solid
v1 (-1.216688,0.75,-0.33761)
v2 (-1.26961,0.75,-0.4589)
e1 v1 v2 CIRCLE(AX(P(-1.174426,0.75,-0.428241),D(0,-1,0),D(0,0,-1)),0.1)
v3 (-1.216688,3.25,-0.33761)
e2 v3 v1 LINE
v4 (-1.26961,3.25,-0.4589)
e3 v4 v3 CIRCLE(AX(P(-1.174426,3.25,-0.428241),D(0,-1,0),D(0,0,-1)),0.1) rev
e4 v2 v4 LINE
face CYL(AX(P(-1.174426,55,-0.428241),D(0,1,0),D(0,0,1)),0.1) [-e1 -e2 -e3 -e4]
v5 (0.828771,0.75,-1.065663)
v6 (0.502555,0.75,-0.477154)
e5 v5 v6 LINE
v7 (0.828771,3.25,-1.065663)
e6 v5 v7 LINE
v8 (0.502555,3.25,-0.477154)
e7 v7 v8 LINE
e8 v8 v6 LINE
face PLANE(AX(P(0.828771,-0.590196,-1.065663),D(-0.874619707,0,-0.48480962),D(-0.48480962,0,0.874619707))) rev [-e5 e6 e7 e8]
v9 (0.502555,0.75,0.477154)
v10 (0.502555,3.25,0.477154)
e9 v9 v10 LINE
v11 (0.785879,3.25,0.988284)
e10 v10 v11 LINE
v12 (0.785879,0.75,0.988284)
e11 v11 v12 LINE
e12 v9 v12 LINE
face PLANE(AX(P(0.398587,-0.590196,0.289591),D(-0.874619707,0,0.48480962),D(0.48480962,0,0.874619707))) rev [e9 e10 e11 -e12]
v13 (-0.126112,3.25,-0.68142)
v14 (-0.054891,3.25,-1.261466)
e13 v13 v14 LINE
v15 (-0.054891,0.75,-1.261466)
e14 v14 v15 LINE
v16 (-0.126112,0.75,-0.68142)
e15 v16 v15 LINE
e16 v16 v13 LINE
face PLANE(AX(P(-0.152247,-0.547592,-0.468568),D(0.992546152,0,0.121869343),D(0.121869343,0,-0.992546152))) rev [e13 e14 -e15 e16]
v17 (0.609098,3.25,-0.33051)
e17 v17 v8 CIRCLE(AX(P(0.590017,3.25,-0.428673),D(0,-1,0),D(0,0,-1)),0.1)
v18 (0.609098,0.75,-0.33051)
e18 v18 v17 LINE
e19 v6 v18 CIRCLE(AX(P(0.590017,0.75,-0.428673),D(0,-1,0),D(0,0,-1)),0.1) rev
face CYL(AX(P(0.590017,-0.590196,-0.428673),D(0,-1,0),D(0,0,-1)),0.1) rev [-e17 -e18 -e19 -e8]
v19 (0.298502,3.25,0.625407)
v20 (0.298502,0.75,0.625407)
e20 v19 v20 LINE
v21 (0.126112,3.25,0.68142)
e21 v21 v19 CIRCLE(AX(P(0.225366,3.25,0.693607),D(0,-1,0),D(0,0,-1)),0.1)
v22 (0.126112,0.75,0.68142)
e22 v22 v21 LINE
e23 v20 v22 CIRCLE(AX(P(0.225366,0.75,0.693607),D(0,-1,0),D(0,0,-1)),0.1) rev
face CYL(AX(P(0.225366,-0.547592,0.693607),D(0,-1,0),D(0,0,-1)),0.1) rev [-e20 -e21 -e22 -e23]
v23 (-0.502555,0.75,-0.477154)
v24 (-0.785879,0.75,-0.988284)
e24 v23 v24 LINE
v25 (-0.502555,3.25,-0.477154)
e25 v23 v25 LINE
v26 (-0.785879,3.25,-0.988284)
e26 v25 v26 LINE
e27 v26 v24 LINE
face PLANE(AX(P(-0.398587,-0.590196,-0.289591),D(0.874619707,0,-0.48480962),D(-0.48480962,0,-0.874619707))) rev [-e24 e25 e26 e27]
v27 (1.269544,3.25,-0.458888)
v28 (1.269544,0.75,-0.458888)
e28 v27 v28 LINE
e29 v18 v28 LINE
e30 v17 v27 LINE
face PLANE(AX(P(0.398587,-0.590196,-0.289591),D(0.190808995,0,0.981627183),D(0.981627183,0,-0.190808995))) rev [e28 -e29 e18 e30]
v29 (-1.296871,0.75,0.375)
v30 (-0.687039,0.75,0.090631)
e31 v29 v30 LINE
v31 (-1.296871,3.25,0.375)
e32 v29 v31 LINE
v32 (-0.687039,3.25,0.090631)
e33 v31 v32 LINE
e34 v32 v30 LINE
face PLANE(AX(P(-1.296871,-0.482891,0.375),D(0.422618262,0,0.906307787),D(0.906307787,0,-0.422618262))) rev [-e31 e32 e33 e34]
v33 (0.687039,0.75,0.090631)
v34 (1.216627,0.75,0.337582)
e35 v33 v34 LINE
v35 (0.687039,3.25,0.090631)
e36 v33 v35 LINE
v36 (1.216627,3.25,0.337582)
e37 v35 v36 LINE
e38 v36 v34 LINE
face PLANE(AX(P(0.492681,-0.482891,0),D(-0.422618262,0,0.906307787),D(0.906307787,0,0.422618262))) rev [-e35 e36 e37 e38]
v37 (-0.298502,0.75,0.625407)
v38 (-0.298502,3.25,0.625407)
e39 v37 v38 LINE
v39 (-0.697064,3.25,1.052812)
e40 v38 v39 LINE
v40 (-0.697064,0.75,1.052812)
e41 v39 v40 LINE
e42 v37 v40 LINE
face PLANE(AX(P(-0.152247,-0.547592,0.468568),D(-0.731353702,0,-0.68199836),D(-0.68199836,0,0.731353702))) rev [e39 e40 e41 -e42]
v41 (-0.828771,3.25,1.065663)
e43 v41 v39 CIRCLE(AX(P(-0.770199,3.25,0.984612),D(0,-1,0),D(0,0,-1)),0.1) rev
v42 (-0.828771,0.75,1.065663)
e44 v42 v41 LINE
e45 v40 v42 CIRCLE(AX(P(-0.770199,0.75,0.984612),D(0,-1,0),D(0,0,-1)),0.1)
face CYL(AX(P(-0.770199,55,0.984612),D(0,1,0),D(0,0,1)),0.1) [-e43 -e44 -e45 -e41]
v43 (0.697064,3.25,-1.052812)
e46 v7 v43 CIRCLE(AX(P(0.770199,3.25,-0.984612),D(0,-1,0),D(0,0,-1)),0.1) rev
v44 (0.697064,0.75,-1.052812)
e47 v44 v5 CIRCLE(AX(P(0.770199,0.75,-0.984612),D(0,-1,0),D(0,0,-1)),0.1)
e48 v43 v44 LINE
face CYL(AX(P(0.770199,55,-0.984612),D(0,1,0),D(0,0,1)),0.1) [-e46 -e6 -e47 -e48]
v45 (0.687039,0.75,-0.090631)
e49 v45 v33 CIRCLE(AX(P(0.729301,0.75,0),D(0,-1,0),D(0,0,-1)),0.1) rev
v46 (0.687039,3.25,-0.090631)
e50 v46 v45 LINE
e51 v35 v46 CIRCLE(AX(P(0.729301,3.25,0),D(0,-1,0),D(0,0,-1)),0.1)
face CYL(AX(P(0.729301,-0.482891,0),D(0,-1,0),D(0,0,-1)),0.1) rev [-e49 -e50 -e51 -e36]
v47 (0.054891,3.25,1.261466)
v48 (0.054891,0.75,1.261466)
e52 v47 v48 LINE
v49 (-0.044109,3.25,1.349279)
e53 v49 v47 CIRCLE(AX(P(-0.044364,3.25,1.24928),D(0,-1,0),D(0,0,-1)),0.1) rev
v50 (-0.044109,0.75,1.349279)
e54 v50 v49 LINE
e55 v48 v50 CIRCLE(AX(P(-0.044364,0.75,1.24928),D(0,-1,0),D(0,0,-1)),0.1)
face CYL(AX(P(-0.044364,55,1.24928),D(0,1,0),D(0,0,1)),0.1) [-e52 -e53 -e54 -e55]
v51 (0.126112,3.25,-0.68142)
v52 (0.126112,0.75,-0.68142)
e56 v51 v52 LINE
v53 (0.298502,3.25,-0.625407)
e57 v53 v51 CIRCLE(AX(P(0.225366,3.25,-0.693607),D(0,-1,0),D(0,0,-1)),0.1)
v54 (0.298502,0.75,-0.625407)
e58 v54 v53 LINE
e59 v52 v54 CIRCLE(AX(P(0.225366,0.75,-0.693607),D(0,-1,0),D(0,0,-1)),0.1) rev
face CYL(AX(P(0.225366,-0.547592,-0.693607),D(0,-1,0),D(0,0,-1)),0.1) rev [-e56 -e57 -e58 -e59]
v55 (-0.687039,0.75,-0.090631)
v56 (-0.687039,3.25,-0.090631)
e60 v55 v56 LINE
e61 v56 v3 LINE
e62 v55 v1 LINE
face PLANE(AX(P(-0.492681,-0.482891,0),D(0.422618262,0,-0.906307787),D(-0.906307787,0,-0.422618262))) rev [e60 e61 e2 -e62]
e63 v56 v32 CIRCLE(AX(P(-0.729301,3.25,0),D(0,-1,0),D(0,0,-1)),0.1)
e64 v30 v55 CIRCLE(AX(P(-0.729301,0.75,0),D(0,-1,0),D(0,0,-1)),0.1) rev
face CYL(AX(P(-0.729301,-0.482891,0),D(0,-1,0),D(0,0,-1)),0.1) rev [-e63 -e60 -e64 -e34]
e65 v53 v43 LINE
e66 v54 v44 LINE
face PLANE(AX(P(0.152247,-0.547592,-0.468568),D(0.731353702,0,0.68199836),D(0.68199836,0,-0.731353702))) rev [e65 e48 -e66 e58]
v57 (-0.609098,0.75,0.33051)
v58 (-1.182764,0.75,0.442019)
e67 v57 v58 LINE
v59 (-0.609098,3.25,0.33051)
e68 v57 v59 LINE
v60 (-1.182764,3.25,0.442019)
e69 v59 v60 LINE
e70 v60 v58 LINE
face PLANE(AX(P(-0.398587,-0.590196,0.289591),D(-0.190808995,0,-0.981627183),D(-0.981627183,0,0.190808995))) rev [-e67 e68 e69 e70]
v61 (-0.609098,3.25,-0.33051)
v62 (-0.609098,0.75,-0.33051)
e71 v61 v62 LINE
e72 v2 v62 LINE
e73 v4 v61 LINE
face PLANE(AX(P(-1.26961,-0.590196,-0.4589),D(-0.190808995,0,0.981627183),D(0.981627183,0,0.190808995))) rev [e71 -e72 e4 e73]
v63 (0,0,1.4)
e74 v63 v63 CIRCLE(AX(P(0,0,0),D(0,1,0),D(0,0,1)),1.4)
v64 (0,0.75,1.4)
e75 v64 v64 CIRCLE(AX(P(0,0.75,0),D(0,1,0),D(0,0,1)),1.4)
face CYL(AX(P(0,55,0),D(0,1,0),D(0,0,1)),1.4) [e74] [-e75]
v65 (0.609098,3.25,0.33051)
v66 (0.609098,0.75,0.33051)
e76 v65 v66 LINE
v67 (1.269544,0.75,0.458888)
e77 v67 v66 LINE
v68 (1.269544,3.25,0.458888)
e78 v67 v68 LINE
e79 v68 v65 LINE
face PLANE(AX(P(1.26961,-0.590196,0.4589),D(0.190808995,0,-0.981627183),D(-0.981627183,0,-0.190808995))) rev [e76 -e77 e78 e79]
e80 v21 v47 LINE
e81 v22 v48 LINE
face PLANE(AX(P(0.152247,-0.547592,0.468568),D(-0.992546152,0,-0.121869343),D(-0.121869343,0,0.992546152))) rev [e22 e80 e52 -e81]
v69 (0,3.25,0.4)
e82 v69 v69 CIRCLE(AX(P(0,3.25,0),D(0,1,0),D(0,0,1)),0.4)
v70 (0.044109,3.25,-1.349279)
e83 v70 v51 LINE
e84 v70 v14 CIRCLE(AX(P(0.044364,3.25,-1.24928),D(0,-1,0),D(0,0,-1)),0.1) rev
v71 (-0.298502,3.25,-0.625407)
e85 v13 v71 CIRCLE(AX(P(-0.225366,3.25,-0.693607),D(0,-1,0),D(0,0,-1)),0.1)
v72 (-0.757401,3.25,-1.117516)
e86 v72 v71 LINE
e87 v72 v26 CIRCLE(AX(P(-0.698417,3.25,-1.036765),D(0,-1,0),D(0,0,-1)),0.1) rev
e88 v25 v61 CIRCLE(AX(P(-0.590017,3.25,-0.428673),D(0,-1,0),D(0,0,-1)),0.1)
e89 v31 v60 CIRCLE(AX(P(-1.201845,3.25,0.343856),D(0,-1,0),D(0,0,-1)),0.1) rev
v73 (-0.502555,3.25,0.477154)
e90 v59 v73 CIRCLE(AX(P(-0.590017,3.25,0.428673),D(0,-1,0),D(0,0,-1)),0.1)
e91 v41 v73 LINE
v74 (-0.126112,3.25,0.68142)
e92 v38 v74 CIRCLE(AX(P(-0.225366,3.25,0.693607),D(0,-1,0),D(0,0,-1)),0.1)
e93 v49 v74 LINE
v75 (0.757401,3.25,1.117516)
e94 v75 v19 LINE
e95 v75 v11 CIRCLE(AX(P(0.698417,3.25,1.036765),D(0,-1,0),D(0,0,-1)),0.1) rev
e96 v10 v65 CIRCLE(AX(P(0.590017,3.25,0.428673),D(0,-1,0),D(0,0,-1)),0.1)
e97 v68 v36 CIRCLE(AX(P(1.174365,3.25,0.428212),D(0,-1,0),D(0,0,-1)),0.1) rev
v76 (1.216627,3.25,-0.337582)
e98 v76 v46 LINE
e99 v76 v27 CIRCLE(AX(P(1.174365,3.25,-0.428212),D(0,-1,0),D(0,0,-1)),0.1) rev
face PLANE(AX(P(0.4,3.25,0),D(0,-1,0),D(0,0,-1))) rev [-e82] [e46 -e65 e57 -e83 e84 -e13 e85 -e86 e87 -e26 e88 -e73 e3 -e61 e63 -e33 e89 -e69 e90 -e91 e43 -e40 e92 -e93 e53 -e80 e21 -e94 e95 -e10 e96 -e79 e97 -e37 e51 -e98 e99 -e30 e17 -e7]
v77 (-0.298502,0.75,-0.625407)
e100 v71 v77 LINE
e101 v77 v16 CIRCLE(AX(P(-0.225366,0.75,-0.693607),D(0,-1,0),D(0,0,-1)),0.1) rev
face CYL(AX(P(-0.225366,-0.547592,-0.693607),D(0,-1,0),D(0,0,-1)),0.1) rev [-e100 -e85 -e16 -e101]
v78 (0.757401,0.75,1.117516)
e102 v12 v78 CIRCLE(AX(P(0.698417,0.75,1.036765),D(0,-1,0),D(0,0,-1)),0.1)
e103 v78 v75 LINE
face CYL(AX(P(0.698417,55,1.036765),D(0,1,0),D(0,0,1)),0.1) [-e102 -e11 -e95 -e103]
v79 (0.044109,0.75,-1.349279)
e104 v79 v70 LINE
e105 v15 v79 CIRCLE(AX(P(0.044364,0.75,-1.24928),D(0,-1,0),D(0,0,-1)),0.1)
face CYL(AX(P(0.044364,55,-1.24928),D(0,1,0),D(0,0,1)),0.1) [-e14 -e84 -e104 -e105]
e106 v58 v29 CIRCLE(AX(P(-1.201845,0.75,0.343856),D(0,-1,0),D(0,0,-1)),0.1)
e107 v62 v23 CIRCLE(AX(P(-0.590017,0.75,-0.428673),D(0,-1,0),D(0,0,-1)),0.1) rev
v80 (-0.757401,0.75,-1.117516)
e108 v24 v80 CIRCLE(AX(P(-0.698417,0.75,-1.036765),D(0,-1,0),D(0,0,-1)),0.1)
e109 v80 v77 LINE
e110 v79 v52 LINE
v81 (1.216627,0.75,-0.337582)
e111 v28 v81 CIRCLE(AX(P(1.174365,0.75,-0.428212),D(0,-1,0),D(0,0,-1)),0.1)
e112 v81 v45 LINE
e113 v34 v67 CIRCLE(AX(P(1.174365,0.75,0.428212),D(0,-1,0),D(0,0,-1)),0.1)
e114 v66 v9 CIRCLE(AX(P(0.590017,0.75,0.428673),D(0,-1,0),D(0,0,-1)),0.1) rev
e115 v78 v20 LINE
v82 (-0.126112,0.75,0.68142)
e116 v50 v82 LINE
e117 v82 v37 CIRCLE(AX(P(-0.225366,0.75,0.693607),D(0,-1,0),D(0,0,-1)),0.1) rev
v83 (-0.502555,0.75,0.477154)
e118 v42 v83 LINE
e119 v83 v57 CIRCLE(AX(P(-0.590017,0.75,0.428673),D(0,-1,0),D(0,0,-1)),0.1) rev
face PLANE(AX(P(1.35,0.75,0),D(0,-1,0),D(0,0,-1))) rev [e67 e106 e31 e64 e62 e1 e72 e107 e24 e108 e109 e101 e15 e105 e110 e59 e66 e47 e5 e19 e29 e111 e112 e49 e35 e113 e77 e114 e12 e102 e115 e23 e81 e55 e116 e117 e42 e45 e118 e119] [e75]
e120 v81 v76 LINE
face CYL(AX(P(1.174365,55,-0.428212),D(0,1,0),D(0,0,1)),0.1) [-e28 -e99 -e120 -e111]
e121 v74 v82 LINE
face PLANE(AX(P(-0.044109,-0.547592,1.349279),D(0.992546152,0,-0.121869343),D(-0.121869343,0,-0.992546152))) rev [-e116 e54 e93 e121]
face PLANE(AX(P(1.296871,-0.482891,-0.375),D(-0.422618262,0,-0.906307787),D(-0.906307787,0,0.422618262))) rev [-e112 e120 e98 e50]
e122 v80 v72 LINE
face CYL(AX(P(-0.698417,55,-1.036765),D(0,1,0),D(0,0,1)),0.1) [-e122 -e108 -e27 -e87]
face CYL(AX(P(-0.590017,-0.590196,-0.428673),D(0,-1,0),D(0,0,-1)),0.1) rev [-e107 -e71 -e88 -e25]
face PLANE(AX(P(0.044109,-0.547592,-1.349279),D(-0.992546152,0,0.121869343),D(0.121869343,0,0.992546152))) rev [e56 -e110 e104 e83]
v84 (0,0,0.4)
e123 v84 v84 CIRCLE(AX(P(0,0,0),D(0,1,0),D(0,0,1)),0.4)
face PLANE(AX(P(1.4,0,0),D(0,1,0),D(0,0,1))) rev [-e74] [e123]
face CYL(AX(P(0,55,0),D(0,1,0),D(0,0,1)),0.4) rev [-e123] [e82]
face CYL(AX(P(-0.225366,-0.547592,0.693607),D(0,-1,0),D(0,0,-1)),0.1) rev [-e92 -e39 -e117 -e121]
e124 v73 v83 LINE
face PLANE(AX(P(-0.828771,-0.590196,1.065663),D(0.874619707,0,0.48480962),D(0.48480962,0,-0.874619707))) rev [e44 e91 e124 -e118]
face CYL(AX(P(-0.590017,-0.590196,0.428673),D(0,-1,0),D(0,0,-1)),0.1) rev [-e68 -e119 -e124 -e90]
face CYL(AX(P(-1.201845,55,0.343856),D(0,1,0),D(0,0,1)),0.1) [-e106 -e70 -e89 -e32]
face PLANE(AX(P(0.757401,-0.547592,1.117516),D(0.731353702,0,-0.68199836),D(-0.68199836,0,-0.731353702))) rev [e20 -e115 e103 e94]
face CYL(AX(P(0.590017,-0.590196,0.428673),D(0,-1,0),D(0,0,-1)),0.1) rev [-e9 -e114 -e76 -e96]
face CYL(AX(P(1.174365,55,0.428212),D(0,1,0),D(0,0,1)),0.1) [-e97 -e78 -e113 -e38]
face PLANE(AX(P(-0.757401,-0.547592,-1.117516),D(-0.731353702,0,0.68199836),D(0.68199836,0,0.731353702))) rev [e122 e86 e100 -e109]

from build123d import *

# Parameters (mm, degrees)
CUT_EXTRUDE1_DEPTH = 2.5
FILLET1_R          = 0.1
CIRPATTERN1_START  = 0.75
CIRPATTERN1_DEPTH  = 2.5


# Read off the part's stored shape, not the designer's step: CirPattern1
with BuildPart() as part:
    # Sketch1 → Revolve1 (revolve)
    with BuildSketch(Plane.XY, mode=Mode.PRIVATE) as revolve1_sk:
        Polygon((0.4, 0), (0.4, 3.25), (1.35, 3.25), (1.35, 0.75), (1.4, 0.75), (1.4, 0), align=None)
    revolve(revolve1_sk.sketch.rotate(Axis((0, 55, 0), (0, -1, 0)), 90), axis=Axis((0, 55, 0), (0, -1, 0)))

    # Sketch2 → Cut-Extrude1 (cut)
    with BuildSketch(Plane(origin=(0, 3.25, 0), x_dir=(1, 0, 0), z_dir=(0, 1, 0))):
        Polygon((1.296871235, 0.375), (0.49268114, 0), (1.296871235, -0.375), (1.471211197, -0.375), (1.471211197, 0.375), align=None)
    extrude(amount=-CUT_EXTRUDE1_DEPTH, mode=Mode.SUBTRACT)

    # Fillet1
    fillet1_edges = [part.edges().sort_by_distance(p)[0] for p in [
        (0.49268114, 2, 0),
        (1.296871235, 2, 0.375),
        (1.296871235, 2, -0.375),
    ]]
    fillet(fillet1_edges, radius=FILLET1_R)

    # CirPattern1 outline → CirPattern1 (cut)
    with BuildSketch(Plane(origin=(0, 0, 0), x_dir=(1, 0, 0), z_dir=(0, 1, 0)).offset(CIRPATTERN1_START)):
        with BuildLine():
            ThreePointArc((1.268314657, -0.462469385), (1.268946471, -0.460684309), (1.269544372, -0.45888759))
            Line((1.269544372, -0.45888759), (0.609098044, -0.330509829))
            ThreePointArc((0.609098044, -0.330509829), (0.509115445, -0.369894022), (0.502555173, -0.47715351))
            Line((0.502555173, -0.47715351), (0.785879225, -0.988283629))
            ThreePointArc((0.785879225, -0.988283629), (0.796074313, -1.058284325), (0.757401445, -1.117516466))
            ThreePointArc((0.757401445, -1.117516466), (1.064496642, -0.830269173), (1.268314657, -0.462469385))
        make_face()
        with BuildLine():
            ThreePointArc((1.268314657, 0.462469385), (1.091055986, 0.795045179), (0.828771399, 1.065663159))
            Line((0.828771399, 1.065663159), (0.502555173, 0.47715351))
            ThreePointArc((0.502555173, 0.47715351), (0.509115445, 0.369894022), (0.609098044, 0.330509829))
            Line((0.609098044, 0.330509829), (1.269544372, 0.45888759))
            ThreePointArc((1.269544372, 0.45888759), (1.268946471, 0.460684309), (1.268314657, 0.462469385))
        make_face()
        with BuildLine():
            ThreePointArc((0.828771399, 1.065663159), (0.458900413, 1.269610338), (0.044109058, 1.349279212))
            Line((0.044109058, 1.349279212), (0.12611188, 0.681419818))
            ThreePointArc((0.12611188, 0.681419818), (0.194464795, 0.5985011), (0.298501865, 0.625406916))
            Line((0.298501865, 0.625406916), (0.697063549, 1.052811995))
            ThreePointArc((0.697063549, 1.052811995), (0.760487712, 1.084139504), (0.828771399, 1.065663159))
        make_face()
        with BuildLine():
            ThreePointArc((0.044109058, 1.349279212), (-0.375, 1.296871235), (-0.757401445, 1.117516466))
            Line((-0.757401445, 1.117516466), (-0.298501865, 0.625406916))
            ThreePointArc((-0.298501865, 0.625406916), (-0.194464795, 0.5985011), (-0.12611188, 0.681419818))
            Line((-0.12611188, 0.681419818), (-0.054891106, 1.26146647))
            ThreePointArc((-0.054891106, 1.26146647), (-0.021993729, 1.324090745), (0.044109058, 1.349279212))
        make_face()
        with BuildLine():
            ThreePointArc((-0.757401445, 1.117516466), (-1.065663159, 0.828771399), (-1.269610338, 0.458900413))
            Line((-1.269610338, 0.458900413), (-0.609098044, 0.330509829))
            ThreePointArc((-0.609098044, 0.330509829), (-0.509115445, 0.369894022), (-0.502555173, 0.47715351))
            Line((-0.502555173, 0.47715351), (-0.785879225, 0.988283629))
            ThreePointArc((-0.785879225, 0.988283629), (-0.796074313, 1.058284325), (-0.757401445, 1.117516466))
        make_face()
        with BuildLine():
            ThreePointArc((-1.269610338, 0.458900413), (-1.349279212, 0.044109057), (-1.296871235, -0.375))
            Line((-1.296871235, -0.375), (-0.687039472, -0.090630779))
            ThreePointArc((-0.687039472, -0.090630779), (-0.629301298, 0), (-0.687039472, 0.090630779))
            Line((-0.687039472, 0.090630779), (-1.216688191, 0.337610032))
            ThreePointArc((-1.216688191, 0.337610032), (-1.266081567, 0.388249263), (-1.269610338, 0.458900413))
        make_face()
        with BuildLine():
            ThreePointArc((-1.296871235, -0.375), (-1.117516466, -0.757401445), (-0.828771399, -1.065663159))
            Line((-0.828771399, -1.065663159), (-0.502555173, -0.47715351))
            ThreePointArc((-0.502555173, -0.47715351), (-0.509115445, -0.369894022), (-0.609098044, -0.330509829))
            Line((-0.609098044, -0.330509829), (-1.182763621, -0.442019121))
            ThreePointArc((-1.182763621, -0.442019121), (-1.252488695, -0.430083821), (-1.296871235, -0.375))
        make_face()
        with BuildLine():
            ThreePointArc((-0.828771399, -1.065663159), (-0.458900413, -1.269610338), (-0.044109058, -1.349279212))
            Line((-0.044109058, -1.349279212), (-0.12611188, -0.681419818))
            ThreePointArc((-0.12611188, -0.681419818), (-0.194464795, -0.5985011), (-0.298501865, -0.625406916))
            Line((-0.298501865, -0.625406916), (-0.697063549, -1.052811995))
            ThreePointArc((-0.697063549, -1.052811995), (-0.760487712, -1.084139504), (-0.828771399, -1.065663159))
        make_face()
        with BuildLine():
            ThreePointArc((-0.044109058, -1.349279212), (0.375, -1.296871235), (0.757401445, -1.117516466))
            Line((0.757401445, -1.117516466), (0.298501865, -0.625406916))
            ThreePointArc((0.298501865, -0.625406916), (0.194464795, -0.5985011), (0.12611188, -0.681419818))
            Line((0.12611188, -0.681419818), (0.054891106, -1.26146647))
            ThreePointArc((0.054891106, -1.26146647), (0.021993729, -1.324090745), (-0.044109058, -1.349279212))
        make_face()
    extrude(amount=CIRPATTERN1_DEPTH, mode=Mode.SUBTRACT)


solid = part.part
